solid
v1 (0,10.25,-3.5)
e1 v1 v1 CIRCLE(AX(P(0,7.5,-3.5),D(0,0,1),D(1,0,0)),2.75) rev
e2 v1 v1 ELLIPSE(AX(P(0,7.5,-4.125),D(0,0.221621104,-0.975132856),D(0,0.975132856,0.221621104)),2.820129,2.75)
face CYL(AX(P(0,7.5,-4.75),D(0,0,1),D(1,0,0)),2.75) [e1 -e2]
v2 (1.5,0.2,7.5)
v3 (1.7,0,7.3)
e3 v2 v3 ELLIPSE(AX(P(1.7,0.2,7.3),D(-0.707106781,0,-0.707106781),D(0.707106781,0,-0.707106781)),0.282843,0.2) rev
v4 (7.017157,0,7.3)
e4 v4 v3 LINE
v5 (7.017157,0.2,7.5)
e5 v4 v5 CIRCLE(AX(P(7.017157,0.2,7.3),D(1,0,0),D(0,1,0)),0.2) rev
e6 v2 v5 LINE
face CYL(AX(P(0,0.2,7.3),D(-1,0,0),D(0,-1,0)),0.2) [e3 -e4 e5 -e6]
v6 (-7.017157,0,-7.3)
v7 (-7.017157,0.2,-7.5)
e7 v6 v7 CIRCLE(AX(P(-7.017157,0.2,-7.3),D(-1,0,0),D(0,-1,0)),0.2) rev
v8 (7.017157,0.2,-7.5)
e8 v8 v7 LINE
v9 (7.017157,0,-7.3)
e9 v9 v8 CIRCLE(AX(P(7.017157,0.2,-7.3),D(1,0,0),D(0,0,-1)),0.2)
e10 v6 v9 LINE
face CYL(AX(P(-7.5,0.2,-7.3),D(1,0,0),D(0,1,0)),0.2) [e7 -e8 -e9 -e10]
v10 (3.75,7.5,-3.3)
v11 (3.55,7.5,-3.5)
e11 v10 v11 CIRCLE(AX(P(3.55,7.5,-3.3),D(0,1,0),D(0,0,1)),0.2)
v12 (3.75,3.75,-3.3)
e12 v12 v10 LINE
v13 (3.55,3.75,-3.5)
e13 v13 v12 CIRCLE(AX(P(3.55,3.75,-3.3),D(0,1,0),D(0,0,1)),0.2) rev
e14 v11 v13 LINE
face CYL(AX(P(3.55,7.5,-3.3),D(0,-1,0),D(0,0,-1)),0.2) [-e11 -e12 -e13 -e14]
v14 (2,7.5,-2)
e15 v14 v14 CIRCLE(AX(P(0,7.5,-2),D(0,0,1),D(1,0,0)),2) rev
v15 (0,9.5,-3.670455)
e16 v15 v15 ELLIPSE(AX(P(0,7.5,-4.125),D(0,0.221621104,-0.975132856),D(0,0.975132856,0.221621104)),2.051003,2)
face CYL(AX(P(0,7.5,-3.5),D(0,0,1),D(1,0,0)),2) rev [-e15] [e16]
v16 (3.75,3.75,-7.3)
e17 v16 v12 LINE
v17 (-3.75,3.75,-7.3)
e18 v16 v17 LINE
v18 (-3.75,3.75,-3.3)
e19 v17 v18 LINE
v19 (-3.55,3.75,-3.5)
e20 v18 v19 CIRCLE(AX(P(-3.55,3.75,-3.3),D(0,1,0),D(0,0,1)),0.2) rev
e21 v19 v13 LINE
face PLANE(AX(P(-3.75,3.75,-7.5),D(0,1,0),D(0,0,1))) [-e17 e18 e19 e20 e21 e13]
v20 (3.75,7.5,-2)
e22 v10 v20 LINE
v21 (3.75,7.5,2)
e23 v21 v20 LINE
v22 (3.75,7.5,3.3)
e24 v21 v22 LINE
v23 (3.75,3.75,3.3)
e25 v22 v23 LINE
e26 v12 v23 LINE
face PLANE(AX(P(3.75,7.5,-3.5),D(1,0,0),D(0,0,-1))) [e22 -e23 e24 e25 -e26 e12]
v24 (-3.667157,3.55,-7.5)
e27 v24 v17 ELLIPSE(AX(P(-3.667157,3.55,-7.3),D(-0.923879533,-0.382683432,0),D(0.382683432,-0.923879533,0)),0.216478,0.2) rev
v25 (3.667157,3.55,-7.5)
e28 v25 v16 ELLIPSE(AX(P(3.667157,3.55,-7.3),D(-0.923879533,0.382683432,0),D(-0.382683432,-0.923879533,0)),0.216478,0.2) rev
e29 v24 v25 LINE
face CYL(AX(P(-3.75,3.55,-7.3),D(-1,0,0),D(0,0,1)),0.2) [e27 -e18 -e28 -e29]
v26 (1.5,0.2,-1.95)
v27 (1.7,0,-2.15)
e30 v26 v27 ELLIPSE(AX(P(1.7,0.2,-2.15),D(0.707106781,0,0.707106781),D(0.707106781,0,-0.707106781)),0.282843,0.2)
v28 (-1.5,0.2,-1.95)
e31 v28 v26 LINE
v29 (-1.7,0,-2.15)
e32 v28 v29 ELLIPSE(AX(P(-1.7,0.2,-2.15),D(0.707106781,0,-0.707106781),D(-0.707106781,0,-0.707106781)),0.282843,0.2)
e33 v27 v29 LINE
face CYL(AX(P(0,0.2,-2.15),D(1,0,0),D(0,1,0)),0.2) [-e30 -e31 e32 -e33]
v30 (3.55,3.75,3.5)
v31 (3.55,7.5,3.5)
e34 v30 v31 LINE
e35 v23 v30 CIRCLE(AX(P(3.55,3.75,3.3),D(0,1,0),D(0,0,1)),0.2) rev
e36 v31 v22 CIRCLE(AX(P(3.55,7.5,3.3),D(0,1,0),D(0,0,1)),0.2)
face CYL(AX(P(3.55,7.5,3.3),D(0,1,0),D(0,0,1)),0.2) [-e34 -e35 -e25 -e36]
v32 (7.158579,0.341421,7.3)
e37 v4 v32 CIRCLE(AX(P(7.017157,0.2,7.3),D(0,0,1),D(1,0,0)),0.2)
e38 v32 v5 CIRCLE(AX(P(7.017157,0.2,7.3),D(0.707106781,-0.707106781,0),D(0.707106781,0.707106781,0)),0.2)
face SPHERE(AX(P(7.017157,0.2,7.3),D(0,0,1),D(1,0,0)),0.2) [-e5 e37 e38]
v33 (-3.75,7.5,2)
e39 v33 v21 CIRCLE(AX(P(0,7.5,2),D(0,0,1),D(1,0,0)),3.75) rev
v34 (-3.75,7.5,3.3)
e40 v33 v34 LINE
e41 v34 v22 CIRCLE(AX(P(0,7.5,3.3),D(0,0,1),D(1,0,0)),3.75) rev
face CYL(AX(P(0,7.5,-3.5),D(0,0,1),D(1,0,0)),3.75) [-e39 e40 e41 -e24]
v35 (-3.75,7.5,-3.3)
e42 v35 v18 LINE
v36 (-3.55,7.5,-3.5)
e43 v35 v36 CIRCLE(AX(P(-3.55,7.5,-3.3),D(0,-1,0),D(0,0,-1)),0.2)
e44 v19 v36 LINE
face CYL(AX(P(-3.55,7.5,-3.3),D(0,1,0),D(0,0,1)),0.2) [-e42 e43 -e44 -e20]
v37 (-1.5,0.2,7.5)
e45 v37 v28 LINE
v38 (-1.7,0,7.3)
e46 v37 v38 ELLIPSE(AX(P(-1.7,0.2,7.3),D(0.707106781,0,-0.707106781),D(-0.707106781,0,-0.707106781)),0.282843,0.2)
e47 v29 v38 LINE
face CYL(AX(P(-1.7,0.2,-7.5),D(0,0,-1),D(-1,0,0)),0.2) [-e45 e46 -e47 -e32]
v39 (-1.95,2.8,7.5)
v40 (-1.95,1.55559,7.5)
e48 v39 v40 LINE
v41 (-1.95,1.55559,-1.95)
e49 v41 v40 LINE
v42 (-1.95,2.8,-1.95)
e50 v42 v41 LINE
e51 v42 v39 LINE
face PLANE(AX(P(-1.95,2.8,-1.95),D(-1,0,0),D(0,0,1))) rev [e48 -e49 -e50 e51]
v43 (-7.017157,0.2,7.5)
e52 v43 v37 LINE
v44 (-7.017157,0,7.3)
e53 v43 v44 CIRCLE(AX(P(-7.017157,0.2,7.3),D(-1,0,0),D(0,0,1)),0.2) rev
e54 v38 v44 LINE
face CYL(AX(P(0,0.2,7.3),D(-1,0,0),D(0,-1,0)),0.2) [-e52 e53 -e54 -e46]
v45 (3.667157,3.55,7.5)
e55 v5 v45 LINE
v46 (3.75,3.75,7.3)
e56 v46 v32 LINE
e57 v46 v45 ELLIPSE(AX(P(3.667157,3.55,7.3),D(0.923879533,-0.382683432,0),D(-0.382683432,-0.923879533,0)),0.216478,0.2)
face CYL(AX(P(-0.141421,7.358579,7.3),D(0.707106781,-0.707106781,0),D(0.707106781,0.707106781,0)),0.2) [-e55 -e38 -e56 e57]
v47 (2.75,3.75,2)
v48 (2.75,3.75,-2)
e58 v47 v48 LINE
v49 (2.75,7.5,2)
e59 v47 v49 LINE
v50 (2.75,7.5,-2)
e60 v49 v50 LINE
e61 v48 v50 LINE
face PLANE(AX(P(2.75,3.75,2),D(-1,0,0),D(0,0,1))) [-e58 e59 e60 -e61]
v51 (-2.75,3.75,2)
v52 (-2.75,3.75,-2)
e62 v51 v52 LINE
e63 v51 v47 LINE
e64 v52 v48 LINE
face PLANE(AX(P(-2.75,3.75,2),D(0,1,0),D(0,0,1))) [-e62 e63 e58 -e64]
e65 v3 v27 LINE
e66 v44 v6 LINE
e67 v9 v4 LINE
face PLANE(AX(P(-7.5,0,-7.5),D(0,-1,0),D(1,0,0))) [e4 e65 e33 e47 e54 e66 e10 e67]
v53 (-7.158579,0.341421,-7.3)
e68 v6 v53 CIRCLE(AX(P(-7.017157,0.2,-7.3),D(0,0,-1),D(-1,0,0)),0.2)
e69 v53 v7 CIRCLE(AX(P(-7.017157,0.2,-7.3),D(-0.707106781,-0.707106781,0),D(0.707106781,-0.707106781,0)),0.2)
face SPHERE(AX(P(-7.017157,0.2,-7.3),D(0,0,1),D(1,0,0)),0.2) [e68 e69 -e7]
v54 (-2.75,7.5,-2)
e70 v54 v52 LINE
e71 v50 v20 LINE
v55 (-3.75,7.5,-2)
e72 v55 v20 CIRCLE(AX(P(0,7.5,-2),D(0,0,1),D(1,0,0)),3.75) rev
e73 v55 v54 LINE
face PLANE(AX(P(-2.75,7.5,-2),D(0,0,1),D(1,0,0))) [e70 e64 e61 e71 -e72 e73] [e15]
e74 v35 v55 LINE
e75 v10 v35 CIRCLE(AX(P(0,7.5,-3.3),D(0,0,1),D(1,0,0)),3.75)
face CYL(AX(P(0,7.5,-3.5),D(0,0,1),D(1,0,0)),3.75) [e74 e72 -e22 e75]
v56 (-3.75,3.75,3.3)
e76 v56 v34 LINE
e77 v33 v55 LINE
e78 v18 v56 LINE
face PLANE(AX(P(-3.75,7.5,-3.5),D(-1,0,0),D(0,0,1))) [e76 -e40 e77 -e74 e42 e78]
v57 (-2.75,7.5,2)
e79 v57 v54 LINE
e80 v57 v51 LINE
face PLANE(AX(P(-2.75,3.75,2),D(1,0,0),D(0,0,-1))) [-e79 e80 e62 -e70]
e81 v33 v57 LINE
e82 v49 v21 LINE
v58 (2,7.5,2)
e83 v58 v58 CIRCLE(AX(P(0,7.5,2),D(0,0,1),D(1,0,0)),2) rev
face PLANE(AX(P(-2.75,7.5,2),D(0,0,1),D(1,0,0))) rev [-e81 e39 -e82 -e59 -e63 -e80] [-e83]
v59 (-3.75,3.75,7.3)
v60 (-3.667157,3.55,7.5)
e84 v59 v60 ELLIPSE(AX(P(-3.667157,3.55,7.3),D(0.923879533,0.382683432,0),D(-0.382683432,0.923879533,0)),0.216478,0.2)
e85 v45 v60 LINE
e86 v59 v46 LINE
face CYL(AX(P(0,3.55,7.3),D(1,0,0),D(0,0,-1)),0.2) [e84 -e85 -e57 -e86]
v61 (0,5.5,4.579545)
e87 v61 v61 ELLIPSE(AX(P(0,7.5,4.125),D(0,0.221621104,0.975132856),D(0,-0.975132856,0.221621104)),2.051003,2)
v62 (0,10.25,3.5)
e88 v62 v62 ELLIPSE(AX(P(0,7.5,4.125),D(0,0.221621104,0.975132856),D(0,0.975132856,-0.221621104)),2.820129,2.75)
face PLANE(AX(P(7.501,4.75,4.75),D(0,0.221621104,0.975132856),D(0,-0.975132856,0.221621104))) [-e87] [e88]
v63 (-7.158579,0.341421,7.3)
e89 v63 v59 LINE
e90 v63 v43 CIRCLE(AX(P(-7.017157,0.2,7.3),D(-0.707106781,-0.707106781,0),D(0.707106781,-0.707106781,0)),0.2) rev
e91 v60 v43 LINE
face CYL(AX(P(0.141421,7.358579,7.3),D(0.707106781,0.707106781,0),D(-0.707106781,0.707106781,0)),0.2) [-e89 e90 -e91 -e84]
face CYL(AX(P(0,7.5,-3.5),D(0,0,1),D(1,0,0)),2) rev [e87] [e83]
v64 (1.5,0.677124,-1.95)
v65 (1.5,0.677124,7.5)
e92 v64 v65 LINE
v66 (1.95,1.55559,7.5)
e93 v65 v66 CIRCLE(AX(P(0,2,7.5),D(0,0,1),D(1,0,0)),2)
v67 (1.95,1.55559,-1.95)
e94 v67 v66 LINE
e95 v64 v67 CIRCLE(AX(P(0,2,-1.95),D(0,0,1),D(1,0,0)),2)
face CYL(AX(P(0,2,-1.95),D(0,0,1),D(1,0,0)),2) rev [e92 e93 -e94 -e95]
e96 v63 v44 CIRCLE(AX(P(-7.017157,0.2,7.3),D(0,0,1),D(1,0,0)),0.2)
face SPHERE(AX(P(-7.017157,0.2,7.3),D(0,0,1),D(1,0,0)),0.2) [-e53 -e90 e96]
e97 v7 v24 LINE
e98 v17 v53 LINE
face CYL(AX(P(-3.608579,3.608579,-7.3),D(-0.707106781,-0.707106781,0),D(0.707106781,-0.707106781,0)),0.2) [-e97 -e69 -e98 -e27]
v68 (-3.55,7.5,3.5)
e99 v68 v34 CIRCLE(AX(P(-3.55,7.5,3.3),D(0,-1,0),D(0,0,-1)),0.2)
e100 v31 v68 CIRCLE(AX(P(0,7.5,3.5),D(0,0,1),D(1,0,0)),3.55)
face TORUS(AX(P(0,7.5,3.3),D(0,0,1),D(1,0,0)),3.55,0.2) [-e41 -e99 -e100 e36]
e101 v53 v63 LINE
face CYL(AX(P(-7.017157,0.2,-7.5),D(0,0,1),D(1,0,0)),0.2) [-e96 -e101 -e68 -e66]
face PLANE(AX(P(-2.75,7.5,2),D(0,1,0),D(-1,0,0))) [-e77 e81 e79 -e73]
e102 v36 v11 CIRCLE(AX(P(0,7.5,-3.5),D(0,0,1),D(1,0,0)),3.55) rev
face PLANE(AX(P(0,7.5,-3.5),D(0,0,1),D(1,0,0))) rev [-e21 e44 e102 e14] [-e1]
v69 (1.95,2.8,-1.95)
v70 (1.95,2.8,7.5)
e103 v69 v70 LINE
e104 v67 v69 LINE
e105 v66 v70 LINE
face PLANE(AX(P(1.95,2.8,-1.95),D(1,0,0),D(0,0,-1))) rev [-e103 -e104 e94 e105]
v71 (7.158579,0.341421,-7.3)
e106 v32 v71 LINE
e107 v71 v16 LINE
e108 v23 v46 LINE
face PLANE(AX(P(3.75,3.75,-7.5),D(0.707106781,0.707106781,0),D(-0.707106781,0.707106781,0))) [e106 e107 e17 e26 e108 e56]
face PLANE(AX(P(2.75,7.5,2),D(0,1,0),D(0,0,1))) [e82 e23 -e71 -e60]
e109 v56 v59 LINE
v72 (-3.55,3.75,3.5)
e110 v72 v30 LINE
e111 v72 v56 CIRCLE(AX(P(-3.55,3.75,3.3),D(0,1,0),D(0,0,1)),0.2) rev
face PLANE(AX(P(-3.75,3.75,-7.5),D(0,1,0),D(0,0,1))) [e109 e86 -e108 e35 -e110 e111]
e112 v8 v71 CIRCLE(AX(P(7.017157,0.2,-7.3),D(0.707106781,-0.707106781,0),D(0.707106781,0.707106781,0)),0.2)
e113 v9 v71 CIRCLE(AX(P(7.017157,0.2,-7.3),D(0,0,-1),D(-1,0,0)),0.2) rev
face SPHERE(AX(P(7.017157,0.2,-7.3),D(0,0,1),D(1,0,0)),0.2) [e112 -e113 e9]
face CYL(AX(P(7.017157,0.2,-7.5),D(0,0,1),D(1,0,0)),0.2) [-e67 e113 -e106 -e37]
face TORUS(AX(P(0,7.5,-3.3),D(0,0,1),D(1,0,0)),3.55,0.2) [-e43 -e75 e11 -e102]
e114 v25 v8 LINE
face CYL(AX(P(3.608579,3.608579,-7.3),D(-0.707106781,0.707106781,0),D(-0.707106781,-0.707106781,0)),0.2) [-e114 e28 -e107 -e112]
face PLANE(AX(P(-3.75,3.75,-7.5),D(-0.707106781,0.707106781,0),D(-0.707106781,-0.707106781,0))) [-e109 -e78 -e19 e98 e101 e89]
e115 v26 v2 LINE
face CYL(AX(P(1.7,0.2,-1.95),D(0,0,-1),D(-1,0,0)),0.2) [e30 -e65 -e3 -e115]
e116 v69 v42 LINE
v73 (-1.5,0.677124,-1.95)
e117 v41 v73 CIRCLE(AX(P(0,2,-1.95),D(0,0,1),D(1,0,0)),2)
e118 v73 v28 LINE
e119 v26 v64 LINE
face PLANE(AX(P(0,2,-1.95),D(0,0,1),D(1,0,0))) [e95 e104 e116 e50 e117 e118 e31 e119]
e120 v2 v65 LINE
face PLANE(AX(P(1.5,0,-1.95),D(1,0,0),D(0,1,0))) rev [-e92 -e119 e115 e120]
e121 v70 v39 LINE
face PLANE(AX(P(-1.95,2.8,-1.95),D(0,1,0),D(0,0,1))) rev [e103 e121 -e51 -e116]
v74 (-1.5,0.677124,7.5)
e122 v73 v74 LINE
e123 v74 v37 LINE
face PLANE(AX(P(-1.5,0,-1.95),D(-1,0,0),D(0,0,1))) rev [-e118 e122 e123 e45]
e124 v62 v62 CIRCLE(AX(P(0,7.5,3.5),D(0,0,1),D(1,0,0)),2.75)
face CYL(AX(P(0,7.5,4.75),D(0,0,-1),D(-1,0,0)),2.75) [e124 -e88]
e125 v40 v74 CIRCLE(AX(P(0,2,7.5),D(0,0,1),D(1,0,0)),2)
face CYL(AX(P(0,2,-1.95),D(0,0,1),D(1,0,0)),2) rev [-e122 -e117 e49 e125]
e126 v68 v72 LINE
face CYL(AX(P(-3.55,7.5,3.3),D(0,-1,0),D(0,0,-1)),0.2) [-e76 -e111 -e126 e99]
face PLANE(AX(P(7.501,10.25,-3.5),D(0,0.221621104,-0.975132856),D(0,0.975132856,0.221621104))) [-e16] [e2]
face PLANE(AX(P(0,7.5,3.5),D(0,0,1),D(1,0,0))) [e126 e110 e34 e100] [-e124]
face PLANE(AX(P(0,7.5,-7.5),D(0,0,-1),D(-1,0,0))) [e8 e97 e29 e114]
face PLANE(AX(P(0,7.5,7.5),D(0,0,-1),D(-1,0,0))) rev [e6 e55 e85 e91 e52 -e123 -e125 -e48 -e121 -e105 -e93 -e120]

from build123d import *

# Parameters (mm, degrees)
EXTRUDE_1_DEPTH          = 3.5
EXTRUDE_1_DEPTH_BACK     = 3.5
SKETCH_1_R               = 2
EXTRUDE_2_DEPTH          = 7.5
EXTRUDE_2_DEPTH_BACK     = 7.5
CUT_EXTRUDE_1_DEPTH      = 2
CUT_EXTRUDE_1_DEPTH_BACK = 2
SKETCH_4_R               = 2.75
SKETCH_4_R_2             = 2
EXTRUDE_3_DEPTH          = 1.25
EXTRUDE_START            = 1.25
SKETCH_5_R               = 2.75
SKETCH_5_R_2             = 2
EXTRUDE_4_DEPTH          = 1.25
CUT_EXTRUDE_START        = -2.7500001
CUT_EXTRUDE_2_DEPTH      = 5.5000001
CUT_EXTRUDE_3_DEPTH      = 9.45
FILLET_1_R               = 0.2
FILLET_2_R               = 0.2


# Read off the part's stored shape, not the designer's step: 切除-拉伸2
with BuildPart() as part:
    # 草图1 → 凸台-拉伸1 (new, two sides: drawn at the far end of the back side and taken through both)
    with BuildSketch(Plane.XY.offset(-EXTRUDE_1_DEPTH_BACK)):
        with BuildLine():
            Line((-3.75, 7.5), (-3.75, 3.75))
            Line((-3.75, 3.75), (3.75, 3.75))
            Line((3.75, 3.75), (3.75, 7.5))
            ThreePointArc((3.75, 7.5), (0, 11.25), (-3.75, 7.5))
        make_face()
        with Locations((0, 7.5)):
            Circle(SKETCH_1_R, mode=Mode.SUBTRACT)
    extrude(amount=EXTRUDE_1_DEPTH + EXTRUDE_1_DEPTH_BACK)

    # 草图2 → 凸台-拉伸2 (add, two sides: drawn at the far end of the back side and taken through both)
    with BuildSketch(Plane.XY.offset(-EXTRUDE_2_DEPTH_BACK)):
        Polygon((-7.5, 0), (7.5, 0), (3.75, 3.75), (-3.75, 3.75), align=None)
    extrude(amount=EXTRUDE_2_DEPTH + EXTRUDE_2_DEPTH_BACK)

    # 草图3 → 切除-拉伸1 (cut, two sides: drawn at the far end of the back side and taken through both)
    with BuildSketch(Plane.XY.offset(-CUT_EXTRUDE_1_DEPTH_BACK)):
        Polygon((-2.75, 3.75), (2.75, 3.75), (2.75, 7.5), (3.75, 7.5), (3.75, 11.38728412), (-3.75, 11.38728412), (-3.75, 7.5), (-2.75, 7.5), align=None)
    extrude(amount=CUT_EXTRUDE_1_DEPTH + CUT_EXTRUDE_1_DEPTH_BACK, mode=Mode.SUBTRACT)

    # 草图4 → 凸台-拉伸3 (add)
    with BuildSketch(Plane.XY.offset(3.5)):
        with Locations((0, 7.5)):
            Circle(SKETCH_4_R)
        with Locations((0, 7.5)):
            Circle(SKETCH_4_R_2, mode=Mode.SUBTRACT)
    extrude(amount=EXTRUDE_3_DEPTH)

    # 草图5 → 凸台-拉伸4 (add)
    with BuildSketch(Plane(origin=(0, 0, -3.5), x_dir=(-1, 0, 0), z_dir=(0, 0, -1)).offset(EXTRUDE_START)):
        with Locations(Location((0, 7.5, 0), (0, 0, 180))):
            Circle(SKETCH_5_R)
        with Locations(Location((0, 7.5, 0), (0, 0, 180))):
            Circle(SKETCH_5_R_2, mode=Mode.SUBTRACT)
    extrude(amount=-EXTRUDE_4_DEPTH)

    # 切除-拉伸2 outline → 切除-拉伸2 (cut)
    with BuildSketch(Plane(origin=(0, 0, 0), x_dir=(0, 0, -1), z_dir=(1, 0, 0)).offset(CUT_EXTRUDE_START)):
        Polygon((4.75, 10.25), (3.5, 10.25), (4.75, 4.75), align=None)
        Polygon((-4.75, 10.25), (-4.75, 4.75), (-3.5, 10.25), align=None)
    extrude(amount=CUT_EXTRUDE_2_DEPTH, mode=Mode.SUBTRACT)

    # 草图7 → 切除-拉伸3 (cut)
    with BuildSketch(Plane.XY.offset(7.5)):
        with BuildLine():
            Line((-1.5, 0), (-1.5, 0.677124344))
            ThreePointArc((-1.5, 0.677124344), (-1.780042303, 1.088161527), (-1.95, 1.555590279))
            Line((-1.95, 1.555590279), (-1.95, 2.8))
            Line((-1.95, 2.8), (1.95, 2.8))
            Line((1.95, 2.8), (1.95, 1.555590279))
            ThreePointArc((1.95, 1.555590279), (1.780042303, 1.088161527), (1.5, 0.677124344))
            Line((1.5, 0.677124344), (1.5, 0))
            Line((1.5, 0), (-1.5, 0))
        make_face()
    extrude(amount=-CUT_EXTRUDE_3_DEPTH, mode=Mode.SUBTRACT)

    # 圆角1
    fillet_1_edges = [part.edges().sort_by_distance(p)[0] for p in [
        (4.5, 0, 7.5),
        (7.5, 0, 0),
        (0, 0, -7.5),
        (-7.5, 0, 0),
        (-4.5, 0, 7.5),
        (-1.5, 0, 2.775),
        (0, 0, -1.95),
        (1.5, 0, 2.775),
        (5.625, 1.875, -7.5),
        (0, 3.75, -7.5),
        (-5.625, 1.875, -7.5),
        (0, 3.75, 7.5),
        (-5.625, 1.875, 7.5),
        (5.625, 1.875, 7.5),
    ]]
    fillet(fillet_1_edges, radius=FILLET_1_R)

    # 圆角2
    fillet_2_edges = [part.edges().sort_by_distance(p)[0] for p in [
        (-3.75, 5.625, -3.5),
        (3.75, 5.625, -3.5),
        (0, 11.25, -3.5),
        (-3.75, 5.625, 3.5),
        (3.75, 5.625, 3.5),
        (0, 11.25, 3.5),
    ]]
    fillet(fillet_2_edges, radius=FILLET_2_R)


solid = part.part
